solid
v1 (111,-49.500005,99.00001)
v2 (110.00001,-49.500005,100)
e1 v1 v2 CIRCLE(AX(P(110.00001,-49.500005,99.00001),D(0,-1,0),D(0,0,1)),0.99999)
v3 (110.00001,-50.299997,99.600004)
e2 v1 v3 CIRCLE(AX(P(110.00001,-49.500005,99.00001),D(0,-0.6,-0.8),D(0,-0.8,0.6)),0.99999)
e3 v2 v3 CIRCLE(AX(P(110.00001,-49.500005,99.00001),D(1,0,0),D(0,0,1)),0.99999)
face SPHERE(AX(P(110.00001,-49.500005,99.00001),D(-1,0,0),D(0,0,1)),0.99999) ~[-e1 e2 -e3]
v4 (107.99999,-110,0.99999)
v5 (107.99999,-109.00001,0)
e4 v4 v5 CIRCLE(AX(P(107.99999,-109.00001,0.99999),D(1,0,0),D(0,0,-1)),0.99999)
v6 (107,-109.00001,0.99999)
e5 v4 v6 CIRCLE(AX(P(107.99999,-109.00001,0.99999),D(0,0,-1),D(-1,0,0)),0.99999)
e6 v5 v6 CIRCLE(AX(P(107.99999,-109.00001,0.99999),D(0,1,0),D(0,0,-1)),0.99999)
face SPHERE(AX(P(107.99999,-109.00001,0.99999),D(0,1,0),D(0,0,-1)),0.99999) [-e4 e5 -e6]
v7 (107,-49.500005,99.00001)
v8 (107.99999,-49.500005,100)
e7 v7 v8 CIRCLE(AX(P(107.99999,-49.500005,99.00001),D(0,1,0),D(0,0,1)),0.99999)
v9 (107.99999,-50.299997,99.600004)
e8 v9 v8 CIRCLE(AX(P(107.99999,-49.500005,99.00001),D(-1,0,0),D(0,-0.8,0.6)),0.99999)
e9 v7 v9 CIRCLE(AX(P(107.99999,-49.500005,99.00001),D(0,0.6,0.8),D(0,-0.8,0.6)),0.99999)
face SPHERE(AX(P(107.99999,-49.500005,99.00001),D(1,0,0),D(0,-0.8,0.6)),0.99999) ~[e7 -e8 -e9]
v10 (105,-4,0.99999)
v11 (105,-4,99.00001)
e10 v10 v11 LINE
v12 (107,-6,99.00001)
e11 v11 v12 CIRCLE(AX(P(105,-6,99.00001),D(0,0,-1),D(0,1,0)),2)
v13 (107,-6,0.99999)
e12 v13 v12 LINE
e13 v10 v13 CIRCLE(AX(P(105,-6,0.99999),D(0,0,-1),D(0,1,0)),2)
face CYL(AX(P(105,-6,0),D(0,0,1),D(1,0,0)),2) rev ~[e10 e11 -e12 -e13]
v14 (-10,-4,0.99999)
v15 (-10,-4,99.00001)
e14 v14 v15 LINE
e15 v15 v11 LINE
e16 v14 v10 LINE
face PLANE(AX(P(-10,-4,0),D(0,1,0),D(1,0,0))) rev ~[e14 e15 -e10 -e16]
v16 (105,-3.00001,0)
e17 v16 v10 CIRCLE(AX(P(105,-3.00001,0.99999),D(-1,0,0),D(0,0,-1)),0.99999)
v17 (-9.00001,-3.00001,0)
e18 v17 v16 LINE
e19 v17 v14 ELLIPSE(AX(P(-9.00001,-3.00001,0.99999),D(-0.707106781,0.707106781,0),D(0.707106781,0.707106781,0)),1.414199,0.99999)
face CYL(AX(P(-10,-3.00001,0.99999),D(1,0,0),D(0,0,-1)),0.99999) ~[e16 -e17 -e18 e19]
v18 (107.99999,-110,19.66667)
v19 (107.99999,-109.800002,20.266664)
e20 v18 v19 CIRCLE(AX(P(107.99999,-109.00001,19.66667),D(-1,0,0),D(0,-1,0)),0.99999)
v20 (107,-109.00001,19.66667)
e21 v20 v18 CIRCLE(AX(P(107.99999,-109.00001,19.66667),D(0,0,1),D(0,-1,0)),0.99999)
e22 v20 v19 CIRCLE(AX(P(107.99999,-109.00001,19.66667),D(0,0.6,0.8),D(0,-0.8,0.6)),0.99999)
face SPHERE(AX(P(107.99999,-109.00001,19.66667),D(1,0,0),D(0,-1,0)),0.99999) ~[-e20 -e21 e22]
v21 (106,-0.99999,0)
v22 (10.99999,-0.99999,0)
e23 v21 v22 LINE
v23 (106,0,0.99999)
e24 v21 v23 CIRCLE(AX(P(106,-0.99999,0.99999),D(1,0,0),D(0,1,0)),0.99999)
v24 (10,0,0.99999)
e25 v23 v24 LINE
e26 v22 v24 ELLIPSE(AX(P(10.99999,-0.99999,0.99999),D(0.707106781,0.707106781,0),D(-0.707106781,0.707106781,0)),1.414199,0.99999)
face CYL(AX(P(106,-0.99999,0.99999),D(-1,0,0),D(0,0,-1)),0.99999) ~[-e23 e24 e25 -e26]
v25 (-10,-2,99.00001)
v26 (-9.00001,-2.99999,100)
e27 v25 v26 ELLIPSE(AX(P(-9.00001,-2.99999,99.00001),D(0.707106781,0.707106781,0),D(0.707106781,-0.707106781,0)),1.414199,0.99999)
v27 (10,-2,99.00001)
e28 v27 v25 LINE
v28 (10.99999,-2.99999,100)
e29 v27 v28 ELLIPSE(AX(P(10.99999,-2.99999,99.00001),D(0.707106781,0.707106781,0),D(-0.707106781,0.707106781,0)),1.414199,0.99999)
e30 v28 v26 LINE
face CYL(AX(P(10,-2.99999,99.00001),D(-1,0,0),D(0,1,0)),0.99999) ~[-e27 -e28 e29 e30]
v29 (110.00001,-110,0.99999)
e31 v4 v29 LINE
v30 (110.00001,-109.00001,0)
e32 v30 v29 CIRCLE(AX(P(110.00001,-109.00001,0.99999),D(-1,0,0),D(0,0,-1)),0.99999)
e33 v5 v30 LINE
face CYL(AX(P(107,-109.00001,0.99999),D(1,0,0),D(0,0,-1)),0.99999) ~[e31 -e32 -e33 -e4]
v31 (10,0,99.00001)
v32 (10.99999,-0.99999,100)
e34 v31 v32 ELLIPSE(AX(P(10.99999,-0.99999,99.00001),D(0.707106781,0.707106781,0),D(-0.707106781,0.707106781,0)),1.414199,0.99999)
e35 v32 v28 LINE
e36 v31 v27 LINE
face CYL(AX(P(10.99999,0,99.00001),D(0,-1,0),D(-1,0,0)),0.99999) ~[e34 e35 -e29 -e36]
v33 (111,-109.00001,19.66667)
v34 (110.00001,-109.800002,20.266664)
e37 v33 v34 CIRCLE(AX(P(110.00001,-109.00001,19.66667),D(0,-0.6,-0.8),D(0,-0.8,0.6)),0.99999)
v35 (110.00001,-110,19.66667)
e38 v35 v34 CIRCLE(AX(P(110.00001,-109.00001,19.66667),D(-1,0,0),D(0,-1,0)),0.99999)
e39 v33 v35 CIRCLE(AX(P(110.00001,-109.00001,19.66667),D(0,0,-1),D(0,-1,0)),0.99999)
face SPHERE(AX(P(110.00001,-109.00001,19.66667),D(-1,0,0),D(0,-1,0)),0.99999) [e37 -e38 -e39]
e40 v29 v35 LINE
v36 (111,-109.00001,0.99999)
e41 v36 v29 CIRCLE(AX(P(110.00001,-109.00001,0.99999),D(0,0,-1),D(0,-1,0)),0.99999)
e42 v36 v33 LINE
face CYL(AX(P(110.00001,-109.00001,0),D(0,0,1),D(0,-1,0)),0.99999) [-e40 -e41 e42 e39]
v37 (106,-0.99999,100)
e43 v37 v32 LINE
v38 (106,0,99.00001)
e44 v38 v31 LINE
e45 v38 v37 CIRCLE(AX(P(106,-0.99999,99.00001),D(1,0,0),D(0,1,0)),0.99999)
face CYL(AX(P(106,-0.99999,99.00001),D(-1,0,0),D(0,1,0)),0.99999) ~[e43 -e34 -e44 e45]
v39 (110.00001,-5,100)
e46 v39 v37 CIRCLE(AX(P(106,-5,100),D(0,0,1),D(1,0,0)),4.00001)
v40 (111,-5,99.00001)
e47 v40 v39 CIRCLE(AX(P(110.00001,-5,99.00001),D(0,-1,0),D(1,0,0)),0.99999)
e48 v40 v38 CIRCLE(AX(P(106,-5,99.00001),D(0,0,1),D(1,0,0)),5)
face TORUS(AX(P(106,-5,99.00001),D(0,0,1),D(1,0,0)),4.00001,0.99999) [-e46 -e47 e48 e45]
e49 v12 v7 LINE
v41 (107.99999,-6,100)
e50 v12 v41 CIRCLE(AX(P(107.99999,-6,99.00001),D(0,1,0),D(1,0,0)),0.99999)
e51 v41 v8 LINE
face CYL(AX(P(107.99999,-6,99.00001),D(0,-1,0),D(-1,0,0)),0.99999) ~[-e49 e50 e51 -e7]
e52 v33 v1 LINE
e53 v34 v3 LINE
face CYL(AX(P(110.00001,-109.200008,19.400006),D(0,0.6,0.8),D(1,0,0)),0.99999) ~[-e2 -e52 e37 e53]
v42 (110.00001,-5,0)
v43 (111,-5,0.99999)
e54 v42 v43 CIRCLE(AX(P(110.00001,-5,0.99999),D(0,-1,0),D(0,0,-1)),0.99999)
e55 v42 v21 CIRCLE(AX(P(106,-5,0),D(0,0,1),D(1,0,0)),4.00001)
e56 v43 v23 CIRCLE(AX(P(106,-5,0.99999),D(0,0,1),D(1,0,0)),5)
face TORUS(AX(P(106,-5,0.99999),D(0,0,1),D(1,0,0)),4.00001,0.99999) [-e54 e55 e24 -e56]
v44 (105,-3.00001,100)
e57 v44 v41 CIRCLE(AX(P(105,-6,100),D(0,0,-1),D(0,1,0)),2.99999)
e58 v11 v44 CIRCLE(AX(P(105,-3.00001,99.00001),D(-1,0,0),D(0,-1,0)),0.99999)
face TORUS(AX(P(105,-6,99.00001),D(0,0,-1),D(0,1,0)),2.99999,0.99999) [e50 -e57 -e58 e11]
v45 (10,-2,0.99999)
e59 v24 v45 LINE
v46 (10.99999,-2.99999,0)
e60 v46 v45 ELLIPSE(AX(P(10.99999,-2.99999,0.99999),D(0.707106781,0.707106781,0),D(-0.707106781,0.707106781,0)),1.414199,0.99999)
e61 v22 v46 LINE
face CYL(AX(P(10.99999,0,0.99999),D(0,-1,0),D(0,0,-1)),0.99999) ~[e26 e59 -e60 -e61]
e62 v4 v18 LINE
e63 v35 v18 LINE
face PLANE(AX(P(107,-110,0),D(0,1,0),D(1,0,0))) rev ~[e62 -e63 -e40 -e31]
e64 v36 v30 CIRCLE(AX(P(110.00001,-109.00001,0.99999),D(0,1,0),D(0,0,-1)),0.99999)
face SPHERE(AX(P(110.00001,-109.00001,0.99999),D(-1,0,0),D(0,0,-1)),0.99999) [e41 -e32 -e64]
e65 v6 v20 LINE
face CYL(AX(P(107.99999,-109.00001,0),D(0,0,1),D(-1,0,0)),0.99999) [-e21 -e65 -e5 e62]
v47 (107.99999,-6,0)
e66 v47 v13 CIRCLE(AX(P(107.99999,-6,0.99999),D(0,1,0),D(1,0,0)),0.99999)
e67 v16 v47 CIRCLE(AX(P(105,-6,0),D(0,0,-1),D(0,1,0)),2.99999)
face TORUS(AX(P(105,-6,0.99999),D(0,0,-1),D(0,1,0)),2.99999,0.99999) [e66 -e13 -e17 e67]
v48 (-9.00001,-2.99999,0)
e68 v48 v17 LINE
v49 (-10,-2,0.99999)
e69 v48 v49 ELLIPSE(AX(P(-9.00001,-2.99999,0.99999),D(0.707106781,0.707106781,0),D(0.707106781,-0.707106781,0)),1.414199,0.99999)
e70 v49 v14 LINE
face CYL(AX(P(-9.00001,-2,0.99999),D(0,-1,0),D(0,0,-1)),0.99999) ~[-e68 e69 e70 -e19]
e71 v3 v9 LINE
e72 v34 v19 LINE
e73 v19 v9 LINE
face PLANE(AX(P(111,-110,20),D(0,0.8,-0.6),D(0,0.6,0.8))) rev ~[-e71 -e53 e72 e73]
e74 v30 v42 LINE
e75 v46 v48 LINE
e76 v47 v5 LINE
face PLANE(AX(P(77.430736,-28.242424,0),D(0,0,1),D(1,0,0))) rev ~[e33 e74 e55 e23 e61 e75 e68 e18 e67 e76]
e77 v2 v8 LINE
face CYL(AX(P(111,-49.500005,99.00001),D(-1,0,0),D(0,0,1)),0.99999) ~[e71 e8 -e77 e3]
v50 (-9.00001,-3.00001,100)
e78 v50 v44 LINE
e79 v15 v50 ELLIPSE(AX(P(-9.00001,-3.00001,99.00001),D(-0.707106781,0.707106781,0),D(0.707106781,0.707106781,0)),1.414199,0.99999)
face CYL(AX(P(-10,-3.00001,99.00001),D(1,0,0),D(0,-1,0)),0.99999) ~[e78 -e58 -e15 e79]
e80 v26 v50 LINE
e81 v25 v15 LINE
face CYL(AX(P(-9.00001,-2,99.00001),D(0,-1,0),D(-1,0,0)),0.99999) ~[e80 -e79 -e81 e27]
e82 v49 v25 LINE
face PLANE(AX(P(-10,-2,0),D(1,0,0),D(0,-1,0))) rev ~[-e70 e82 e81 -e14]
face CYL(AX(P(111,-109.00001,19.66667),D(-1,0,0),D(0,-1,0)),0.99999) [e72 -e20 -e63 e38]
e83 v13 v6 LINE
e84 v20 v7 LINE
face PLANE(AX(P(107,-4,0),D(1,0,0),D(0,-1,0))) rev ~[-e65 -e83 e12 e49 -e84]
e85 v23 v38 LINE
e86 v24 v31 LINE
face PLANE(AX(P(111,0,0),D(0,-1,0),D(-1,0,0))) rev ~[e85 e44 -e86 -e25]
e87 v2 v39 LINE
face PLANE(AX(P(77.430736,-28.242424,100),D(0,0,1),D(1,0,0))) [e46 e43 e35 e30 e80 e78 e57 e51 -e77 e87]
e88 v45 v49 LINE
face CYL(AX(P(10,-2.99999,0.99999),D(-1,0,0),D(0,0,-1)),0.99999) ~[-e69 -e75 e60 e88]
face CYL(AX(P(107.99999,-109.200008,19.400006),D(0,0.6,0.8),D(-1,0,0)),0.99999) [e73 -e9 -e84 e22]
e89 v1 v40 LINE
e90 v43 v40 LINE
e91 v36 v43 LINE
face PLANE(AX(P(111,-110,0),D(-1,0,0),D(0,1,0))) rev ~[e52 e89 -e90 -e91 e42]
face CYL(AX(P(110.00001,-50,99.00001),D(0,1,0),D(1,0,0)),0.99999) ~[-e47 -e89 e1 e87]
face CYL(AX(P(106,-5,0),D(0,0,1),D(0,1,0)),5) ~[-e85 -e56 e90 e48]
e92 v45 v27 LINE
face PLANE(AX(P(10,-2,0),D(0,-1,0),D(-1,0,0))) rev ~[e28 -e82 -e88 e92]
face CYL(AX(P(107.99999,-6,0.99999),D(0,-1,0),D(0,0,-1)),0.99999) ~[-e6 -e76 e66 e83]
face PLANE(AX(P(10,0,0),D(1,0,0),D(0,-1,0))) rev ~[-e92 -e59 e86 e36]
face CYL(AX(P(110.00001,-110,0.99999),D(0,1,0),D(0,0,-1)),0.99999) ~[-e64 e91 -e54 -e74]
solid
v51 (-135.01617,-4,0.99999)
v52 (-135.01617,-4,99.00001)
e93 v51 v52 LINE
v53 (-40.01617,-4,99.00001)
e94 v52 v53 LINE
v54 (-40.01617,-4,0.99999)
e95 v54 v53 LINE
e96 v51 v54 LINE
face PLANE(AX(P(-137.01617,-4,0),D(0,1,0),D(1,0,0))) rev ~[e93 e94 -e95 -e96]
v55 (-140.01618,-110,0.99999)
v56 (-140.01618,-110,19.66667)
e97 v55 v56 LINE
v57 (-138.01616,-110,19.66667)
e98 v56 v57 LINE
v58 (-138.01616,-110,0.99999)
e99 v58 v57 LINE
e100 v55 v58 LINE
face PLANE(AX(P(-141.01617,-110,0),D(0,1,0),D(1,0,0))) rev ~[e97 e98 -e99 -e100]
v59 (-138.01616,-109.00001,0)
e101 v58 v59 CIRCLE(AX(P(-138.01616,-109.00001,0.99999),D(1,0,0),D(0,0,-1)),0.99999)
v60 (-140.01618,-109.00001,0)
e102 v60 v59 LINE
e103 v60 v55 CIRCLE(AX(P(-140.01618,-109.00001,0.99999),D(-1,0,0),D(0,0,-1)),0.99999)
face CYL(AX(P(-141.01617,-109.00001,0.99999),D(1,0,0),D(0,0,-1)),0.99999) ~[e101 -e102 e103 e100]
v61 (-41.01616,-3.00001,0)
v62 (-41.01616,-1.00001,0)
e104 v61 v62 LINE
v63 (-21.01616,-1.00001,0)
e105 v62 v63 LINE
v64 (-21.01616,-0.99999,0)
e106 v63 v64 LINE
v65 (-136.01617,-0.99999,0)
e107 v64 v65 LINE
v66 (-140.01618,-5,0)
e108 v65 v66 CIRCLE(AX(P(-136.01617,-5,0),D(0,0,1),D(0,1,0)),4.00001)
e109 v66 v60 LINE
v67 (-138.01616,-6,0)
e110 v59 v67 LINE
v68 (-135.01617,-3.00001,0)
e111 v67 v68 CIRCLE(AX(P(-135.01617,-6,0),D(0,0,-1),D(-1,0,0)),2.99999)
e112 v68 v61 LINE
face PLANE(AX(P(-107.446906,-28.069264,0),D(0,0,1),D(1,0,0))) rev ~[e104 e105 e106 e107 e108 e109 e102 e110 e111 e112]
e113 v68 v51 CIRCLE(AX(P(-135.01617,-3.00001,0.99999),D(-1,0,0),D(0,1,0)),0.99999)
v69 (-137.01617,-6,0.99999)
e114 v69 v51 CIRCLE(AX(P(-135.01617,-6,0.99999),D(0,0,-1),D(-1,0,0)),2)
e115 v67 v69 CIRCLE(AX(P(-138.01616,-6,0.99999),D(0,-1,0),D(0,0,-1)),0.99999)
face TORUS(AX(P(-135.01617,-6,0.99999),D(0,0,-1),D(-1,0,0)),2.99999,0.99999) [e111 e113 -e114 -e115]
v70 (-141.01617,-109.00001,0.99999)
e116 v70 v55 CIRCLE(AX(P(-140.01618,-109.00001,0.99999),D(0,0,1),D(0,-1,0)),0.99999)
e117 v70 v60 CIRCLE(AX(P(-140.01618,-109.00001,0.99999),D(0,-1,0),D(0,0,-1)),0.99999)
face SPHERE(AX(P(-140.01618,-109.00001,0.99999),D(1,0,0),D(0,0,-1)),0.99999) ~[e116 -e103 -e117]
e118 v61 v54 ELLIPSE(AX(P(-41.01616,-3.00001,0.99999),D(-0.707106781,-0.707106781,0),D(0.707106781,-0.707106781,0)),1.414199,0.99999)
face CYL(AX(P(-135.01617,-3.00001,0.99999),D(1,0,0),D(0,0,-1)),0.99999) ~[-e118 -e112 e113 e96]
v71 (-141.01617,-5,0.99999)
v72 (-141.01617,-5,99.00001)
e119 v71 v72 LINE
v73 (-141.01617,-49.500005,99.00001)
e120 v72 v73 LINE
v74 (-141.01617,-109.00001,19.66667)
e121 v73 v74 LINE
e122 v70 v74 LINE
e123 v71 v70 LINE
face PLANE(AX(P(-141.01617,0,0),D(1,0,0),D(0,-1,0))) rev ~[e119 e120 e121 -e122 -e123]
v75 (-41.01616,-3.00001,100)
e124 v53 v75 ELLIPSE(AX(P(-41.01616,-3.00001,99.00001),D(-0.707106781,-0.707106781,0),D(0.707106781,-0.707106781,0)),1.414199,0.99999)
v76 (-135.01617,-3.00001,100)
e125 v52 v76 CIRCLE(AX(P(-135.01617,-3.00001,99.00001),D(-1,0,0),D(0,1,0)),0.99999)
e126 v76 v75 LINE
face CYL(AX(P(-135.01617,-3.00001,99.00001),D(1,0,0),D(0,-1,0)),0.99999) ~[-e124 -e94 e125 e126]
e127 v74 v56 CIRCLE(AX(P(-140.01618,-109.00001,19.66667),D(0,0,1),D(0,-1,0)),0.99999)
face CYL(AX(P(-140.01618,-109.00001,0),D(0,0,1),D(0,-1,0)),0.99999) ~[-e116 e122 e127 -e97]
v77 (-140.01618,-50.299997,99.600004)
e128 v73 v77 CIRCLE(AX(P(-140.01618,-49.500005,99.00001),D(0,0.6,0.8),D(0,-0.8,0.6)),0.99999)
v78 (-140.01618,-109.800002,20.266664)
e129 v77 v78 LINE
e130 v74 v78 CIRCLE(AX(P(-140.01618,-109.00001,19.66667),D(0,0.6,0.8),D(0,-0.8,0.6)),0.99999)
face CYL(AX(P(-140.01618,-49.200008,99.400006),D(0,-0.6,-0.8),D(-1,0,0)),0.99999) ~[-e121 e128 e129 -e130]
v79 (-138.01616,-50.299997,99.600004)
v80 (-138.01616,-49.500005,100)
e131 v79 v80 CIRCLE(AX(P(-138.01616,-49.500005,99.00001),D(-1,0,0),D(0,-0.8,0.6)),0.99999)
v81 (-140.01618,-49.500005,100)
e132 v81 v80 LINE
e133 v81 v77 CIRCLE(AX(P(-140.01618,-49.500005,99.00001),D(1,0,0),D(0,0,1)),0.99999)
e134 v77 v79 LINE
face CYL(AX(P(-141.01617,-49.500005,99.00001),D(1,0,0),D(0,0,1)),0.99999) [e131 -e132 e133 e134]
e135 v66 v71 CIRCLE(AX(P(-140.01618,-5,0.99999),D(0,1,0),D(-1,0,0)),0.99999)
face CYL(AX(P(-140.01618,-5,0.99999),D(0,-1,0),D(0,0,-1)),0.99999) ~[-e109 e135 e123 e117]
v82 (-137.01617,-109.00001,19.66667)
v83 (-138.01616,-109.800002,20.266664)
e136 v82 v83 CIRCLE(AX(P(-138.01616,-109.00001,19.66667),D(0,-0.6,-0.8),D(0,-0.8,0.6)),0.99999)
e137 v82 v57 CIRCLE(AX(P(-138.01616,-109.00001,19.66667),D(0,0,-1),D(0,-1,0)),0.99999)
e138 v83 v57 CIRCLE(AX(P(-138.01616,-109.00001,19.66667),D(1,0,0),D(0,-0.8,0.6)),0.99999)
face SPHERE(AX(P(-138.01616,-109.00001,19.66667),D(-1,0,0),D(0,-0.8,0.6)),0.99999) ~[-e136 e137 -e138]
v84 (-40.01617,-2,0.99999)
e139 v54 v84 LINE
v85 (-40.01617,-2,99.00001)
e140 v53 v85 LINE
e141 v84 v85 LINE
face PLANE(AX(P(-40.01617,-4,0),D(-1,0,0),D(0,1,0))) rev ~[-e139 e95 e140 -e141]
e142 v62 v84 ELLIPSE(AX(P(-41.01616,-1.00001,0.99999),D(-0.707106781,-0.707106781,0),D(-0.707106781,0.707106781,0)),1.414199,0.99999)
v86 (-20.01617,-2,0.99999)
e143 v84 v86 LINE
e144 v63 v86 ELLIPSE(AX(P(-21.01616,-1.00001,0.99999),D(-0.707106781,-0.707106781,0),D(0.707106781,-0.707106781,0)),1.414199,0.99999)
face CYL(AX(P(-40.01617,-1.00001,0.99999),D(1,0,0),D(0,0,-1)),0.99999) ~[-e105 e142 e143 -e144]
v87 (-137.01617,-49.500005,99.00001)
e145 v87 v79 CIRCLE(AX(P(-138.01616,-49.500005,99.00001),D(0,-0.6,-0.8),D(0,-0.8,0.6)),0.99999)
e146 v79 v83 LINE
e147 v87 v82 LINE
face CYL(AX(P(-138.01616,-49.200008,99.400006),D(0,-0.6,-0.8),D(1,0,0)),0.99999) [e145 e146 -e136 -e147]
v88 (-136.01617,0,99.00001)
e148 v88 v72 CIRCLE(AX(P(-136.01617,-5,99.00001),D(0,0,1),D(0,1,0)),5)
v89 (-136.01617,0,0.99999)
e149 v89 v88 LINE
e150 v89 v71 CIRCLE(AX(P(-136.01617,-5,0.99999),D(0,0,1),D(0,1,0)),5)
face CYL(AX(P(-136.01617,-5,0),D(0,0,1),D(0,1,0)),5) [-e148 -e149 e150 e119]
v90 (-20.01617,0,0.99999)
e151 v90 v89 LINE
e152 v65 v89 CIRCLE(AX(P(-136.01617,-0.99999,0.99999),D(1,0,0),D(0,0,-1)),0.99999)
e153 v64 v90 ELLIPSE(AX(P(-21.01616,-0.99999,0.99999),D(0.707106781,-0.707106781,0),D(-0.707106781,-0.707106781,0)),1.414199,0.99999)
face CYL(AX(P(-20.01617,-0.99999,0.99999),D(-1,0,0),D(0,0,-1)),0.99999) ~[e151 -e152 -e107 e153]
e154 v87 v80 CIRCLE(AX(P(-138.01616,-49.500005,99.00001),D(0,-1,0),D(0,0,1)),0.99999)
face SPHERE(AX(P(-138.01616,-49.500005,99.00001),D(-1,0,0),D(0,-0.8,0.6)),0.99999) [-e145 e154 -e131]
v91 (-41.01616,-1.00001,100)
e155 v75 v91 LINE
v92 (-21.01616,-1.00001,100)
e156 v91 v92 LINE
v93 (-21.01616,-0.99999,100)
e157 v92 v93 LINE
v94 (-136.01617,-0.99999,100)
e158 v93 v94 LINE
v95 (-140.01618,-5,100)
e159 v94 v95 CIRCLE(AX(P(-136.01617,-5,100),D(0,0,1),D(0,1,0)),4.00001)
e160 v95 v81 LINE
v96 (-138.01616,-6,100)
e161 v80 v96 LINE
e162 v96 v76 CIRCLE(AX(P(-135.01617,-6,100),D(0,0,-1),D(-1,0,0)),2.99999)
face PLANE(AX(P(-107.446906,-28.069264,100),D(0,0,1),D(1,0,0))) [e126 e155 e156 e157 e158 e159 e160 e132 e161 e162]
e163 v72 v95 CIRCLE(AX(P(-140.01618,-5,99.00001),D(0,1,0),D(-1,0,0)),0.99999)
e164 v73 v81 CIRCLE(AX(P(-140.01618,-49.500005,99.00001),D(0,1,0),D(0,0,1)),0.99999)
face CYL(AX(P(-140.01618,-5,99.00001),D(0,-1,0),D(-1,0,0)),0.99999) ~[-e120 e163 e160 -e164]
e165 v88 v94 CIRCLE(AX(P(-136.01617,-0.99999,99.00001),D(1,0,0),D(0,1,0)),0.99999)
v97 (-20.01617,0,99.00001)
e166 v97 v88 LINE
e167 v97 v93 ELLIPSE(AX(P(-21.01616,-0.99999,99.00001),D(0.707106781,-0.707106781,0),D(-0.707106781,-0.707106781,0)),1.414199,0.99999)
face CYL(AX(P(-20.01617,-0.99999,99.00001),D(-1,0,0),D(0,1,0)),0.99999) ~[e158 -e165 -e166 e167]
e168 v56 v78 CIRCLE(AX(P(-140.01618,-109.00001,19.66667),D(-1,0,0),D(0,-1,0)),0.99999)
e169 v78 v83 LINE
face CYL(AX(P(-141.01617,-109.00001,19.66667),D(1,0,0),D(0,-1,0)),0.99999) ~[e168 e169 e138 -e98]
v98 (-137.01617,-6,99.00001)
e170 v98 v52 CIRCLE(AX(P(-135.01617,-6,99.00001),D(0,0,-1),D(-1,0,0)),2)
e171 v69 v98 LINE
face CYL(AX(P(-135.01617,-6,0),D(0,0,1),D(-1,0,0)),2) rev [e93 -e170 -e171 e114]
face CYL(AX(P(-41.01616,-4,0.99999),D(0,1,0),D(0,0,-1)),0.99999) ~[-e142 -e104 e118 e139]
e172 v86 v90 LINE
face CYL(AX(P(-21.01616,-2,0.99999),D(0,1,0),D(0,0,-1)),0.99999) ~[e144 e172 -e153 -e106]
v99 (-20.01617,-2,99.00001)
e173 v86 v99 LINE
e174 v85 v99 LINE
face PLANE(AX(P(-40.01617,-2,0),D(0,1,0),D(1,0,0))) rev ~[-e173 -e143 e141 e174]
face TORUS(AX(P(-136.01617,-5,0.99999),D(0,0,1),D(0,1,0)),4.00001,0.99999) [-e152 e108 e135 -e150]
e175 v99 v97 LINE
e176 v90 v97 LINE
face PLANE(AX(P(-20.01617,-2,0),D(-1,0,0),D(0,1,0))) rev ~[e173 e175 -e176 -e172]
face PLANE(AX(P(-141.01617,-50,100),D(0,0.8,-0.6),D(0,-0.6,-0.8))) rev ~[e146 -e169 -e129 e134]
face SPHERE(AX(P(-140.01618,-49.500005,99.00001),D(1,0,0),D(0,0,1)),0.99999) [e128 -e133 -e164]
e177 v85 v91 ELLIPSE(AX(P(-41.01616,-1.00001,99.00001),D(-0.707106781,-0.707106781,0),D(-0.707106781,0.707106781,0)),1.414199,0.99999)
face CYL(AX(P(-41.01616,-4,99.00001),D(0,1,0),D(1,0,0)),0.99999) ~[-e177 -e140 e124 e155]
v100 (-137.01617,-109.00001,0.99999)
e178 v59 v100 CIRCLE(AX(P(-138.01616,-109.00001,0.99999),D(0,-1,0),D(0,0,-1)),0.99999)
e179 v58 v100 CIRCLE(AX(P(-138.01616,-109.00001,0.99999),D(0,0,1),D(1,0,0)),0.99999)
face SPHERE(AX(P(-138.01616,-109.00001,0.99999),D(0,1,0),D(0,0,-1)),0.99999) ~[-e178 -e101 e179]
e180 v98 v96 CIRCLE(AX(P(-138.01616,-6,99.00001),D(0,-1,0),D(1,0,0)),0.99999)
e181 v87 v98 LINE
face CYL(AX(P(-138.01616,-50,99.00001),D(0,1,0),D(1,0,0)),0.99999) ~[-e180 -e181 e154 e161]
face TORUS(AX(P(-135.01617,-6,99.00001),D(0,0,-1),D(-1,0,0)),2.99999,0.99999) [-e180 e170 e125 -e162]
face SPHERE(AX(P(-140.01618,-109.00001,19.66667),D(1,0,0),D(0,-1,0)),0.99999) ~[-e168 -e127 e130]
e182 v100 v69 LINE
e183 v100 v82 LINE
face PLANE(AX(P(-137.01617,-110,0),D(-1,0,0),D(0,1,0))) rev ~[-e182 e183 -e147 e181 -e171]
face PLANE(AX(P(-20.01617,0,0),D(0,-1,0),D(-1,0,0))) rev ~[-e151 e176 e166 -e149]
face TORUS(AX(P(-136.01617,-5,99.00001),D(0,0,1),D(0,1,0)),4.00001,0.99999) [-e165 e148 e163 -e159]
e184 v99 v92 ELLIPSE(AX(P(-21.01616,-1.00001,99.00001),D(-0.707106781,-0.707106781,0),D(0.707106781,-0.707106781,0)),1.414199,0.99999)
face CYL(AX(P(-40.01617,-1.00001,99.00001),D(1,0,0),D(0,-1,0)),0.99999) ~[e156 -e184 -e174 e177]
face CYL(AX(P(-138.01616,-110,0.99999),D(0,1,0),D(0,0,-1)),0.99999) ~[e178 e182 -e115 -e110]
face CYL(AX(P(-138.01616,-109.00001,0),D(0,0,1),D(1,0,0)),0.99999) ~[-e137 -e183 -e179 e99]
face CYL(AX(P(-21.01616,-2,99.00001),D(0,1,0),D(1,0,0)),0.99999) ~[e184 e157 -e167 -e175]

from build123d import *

# Parameters (mm, degrees)
F1_DEPTH = 100
F2_DEPTH = 100
F4_DEPTH = 25
F6_DEPTH = 25
F7_R     = 5
F7_2_R   = 5
F8_R     = 2
F8_2_R   = 2
F9_R     = 0.99999
F9_2_R   = 0.99999


# Not quite as in the source:
# - a fillet or chamfer is up to 0.001 mm smaller than in the source, because OpenCascade refuses the exact size


with BuildPart() as f1:
    # F0 (on Top) → F1 (new body)
    with BuildSketch(Plane.XY):
        Polygon((107, 0), (10, 0), (10, -2), (-10, -2), (-10, -4), (107, -4), (107, -110), (111, -110), (111, 0), align=None)
    extrude(amount=F1_DEPTH)

    # F3 (on face) → F4 (cut)
    with BuildSketch(Plane.YZ.offset(111)):
        Polygon((-110, 20), (-50, 100), (-110, 100), align=None)
    extrude(amount=-F4_DEPTH, mode=Mode.SUBTRACT)

    # F7
    f7_edges = [f1.edges().sort_by_distance(p)[0] for p in [
        (111, 0, 50),
    ]]
    fillet(f7_edges, radius=F7_R)

    # F8#2
    f8_2_edges = [f1.edges().sort_by_distance(p)[0] for p in [
        (107, -4, 50),
    ]]
    fillet(f8_2_edges, radius=F8_2_R)

    # F9#2 (radius 1 in the source; OpenCascade refuses exactly that, so slightly less here)
    f9_2_edges = [f1.edges().sort_by_distance(p)[0] for p in [
        (107, -28, 100),
        (106.414214, -4.585786, 100),
        (109, -50, 100),
        (47.5, -4, 100),
        (111, -27.5, 100),
        (-10, -3, 100),
        (109.535534, -1.464466, 100),
        (0, -2, 100),
        (58, 0, 100),
        (10, -1, 100),
        (111, -80, 60),
        (107, -80, 60),
        (109, -110, 20),
        (107, -58, 0),
        (106.414214, -4.585786, 0),
        (109, -110, 0),
        (47.5, -4, 0),
        (111, -57.5, 0),
        (-10, -3, 0),
        (109.535534, -1.464466, 0),
        (0, -2, 0),
        (58, 0, 0),
        (10, -1, 0),
        (111, -110, 10),
        (107, -110, 10),
    ]]
    fillet(f9_2_edges, radius=F9_2_R)


with BuildPart() as f2:
    # F0 (on Top) → F2 (new body)
    with BuildSketch(Plane.XY):
        Polygon((-20.0161703825, 0), (-141.0161703825, 0), (-141.0161703825, -110), (-137.0161703825, -110), (-137.0161703825, -4), (-40.0161703825, -4), (-40.0161703825, -2), (-20.0161703825, -2), align=None)
    extrude(amount=F2_DEPTH)

    # F5 (on face) → F6 (cut)
    with BuildSketch(Plane(origin=(-141.0161703825, 0, 0), x_dir=(0, -1, 0), z_dir=(-1, 0, 0))):
        Polygon((110, 100), (50, 100), (110, 20), align=None)
    extrude(amount=-F6_DEPTH, mode=Mode.SUBTRACT)

    # F7#2
    f7_2_edges = [f2.edges().sort_by_distance(p)[0] for p in [
        (-141.01617, 0, 50),
    ]]
    fillet(f7_2_edges, radius=F7_2_R)

    # F8
    f8_edges = [f2.edges().sort_by_distance(p)[0] for p in [
        (-137.01617, -4, 50),
    ]]
    fillet(f8_edges, radius=F8_R)

    # F9 (radius 1 in the source; OpenCascade refuses exactly that, so slightly less here)
    f9_edges = [f2.edges().sort_by_distance(p)[0] for p in [
        (-137.01617, -28, 100),
        (-136.430384, -4.585786, 100),
        (-139.01617, -50, 100),
        (-87.51617, -4, 100),
        (-141.01617, -27.5, 100),
        (-40.01617, -3, 100),
        (-139.551704, -1.464466, 100),
        (-30.01617, -2, 100),
        (-78.01617, 0, 100),
        (-20.01617, -1, 100),
        (-141.01617, -80, 60),
        (-139.01617, -110, 20),
        (-137.01617, -80, 60),
        (-137.01617, -58, 0),
        (-136.430384, -4.585786, 0),
        (-139.01617, -110, 0),
        (-87.51617, -4, 0),
        (-141.01617, -57.5, 0),
        (-40.01617, -3, 0),
        (-139.551704, -1.464466, 0),
        (-30.01617, -2, 0),
        (-78.01617, 0, 0),
        (-20.01617, -1, 0),
        (-137.01617, -110, 10),
        (-141.01617, -110, 10),
    ]]
    fillet(f9_edges, radius=F9_R)


solid = Compound([f1.part, f2.part])
